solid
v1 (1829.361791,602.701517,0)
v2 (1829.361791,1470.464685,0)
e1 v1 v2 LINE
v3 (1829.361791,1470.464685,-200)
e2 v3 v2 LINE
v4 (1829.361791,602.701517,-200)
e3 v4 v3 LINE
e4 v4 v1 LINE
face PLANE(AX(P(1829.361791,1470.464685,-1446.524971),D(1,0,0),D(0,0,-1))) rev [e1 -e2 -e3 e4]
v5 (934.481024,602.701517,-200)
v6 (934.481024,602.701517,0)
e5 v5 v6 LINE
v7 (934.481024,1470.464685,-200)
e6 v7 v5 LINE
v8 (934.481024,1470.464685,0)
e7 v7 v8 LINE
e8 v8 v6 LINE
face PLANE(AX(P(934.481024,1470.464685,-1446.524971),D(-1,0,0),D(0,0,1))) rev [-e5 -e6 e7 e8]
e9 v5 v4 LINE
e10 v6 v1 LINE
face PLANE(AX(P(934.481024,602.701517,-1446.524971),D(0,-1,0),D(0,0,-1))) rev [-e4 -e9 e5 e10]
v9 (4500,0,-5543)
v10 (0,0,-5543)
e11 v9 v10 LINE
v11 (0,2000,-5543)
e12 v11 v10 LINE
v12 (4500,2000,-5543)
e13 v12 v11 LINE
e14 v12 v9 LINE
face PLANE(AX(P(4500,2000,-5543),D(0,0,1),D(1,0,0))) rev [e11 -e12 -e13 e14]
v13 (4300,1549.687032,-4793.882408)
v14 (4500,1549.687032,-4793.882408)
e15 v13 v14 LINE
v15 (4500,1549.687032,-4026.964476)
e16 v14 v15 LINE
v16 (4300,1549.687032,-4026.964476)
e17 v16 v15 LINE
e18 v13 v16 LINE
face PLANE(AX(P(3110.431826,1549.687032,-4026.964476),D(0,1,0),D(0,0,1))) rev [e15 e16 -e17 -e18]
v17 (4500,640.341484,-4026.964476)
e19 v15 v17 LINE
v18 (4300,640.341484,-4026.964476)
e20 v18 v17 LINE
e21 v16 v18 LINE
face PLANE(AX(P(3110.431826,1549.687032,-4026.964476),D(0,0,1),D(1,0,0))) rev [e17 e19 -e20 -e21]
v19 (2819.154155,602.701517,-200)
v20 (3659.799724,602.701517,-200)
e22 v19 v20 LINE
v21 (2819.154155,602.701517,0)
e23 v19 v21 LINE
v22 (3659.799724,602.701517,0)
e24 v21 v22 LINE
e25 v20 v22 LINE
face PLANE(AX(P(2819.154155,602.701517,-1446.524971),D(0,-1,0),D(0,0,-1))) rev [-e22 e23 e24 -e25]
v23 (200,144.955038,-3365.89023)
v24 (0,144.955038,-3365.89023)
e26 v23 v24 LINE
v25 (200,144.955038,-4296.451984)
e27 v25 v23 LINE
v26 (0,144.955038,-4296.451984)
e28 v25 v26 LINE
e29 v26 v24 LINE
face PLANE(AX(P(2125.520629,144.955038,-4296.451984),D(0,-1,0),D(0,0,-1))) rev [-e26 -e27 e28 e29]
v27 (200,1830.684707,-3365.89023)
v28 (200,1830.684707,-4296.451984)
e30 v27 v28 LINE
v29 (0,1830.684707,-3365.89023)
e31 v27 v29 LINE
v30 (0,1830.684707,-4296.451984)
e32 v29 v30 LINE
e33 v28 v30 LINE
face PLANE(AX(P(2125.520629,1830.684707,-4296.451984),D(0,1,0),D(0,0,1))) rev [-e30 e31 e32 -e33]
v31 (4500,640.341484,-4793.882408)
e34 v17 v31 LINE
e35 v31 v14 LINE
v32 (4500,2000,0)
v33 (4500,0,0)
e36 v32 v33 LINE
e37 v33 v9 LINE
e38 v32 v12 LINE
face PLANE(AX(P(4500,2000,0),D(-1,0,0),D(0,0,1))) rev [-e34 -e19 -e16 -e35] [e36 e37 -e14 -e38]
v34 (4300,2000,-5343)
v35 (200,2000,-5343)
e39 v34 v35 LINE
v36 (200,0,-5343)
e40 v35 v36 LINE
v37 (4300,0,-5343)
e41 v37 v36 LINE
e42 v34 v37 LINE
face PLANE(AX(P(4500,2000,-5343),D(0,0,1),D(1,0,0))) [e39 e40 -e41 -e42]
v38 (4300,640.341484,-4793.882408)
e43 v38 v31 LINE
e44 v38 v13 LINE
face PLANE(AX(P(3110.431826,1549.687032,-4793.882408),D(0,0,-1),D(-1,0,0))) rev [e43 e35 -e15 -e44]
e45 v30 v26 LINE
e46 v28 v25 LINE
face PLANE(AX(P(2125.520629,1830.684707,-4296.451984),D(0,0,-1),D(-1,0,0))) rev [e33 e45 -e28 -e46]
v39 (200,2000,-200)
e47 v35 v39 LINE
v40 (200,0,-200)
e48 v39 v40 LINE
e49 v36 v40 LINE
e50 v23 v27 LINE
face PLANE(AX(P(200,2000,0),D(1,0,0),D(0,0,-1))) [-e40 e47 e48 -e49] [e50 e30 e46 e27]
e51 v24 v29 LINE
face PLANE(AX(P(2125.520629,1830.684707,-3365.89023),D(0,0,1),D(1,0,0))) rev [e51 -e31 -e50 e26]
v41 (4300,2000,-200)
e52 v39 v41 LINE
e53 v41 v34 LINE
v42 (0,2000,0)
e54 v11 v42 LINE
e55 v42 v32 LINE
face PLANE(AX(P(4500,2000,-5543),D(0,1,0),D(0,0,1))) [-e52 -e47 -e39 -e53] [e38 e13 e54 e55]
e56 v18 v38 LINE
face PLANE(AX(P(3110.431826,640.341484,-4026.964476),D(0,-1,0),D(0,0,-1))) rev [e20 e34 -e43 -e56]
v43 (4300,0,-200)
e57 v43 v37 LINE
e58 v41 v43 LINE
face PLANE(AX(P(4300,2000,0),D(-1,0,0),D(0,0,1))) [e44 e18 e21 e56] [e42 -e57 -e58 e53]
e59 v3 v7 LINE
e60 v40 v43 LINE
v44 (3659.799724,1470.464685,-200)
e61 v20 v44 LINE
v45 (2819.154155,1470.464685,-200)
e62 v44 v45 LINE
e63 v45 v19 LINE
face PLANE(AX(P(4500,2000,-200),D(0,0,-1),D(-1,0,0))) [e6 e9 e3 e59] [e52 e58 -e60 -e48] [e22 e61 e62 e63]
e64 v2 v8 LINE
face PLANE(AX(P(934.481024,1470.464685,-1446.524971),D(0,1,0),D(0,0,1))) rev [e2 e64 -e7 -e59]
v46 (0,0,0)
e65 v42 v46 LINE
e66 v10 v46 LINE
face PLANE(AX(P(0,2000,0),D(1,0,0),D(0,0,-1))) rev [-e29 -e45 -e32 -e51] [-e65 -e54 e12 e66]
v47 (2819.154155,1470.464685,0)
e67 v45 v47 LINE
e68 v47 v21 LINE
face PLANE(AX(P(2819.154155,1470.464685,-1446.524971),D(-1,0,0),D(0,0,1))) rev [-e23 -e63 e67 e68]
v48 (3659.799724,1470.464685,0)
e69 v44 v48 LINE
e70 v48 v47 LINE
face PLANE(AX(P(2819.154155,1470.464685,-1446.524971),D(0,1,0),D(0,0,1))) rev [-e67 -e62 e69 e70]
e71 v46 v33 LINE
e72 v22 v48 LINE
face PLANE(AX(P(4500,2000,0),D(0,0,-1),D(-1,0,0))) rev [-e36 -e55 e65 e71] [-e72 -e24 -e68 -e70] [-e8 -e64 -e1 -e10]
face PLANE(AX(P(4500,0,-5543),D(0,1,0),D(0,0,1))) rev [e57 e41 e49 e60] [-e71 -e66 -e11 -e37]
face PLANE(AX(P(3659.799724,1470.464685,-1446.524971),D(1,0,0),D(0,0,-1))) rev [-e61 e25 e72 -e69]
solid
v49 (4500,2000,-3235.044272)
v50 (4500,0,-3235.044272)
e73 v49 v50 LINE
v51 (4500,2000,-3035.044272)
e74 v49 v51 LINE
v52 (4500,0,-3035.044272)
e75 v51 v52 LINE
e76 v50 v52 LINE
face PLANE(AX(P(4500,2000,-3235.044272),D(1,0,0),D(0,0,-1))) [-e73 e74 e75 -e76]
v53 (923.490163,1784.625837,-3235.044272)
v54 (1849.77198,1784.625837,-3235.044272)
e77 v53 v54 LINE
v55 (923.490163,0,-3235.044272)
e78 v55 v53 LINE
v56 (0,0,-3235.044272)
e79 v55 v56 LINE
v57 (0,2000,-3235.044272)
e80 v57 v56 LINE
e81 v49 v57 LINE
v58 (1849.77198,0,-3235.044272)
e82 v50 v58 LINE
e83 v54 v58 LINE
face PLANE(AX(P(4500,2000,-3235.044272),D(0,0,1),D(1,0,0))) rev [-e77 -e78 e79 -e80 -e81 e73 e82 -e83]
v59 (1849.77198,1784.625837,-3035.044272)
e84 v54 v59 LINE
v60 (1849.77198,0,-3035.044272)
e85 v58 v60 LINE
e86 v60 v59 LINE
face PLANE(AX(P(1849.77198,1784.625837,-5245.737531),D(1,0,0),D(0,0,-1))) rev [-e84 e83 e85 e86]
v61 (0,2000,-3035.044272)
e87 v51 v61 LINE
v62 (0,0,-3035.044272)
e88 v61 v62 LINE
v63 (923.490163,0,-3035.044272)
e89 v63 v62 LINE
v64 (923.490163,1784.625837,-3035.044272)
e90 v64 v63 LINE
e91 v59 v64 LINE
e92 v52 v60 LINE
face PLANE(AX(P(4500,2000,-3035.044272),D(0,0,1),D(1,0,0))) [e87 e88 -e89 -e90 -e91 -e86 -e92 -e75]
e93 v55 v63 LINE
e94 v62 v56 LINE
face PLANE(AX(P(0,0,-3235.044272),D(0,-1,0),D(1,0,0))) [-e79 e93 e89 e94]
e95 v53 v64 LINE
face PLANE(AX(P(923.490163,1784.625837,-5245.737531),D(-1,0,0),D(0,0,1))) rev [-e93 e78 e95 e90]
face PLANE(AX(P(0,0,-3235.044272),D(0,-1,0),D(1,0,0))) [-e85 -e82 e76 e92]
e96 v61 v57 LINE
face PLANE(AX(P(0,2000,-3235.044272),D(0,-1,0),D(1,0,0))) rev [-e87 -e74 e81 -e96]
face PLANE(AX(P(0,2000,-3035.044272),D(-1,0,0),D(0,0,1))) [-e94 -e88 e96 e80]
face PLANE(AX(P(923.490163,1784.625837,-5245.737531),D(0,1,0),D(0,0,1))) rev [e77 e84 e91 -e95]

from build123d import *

# Parameters (mm, degrees)
EXTRUDE_1_OUTLINE_W   = 4500
EXTRUDE_1_OUTLINE_H   = 5543
EXTRUDE_1_OUTLINE_W_2 = 4100
EXTRUDE_1_OUTLINE_H_2 = 5143
EXTRUDE_1_DEPTH       = 2000
EXTRUDE_1_2_OUTLINE_W = 4500
EXTRUDE_1_2_OUTLINE_H = 200
EXTRUDE_1_2_DEPTH     = 2000
SKETCH_3_W            = 894.880767268
SKETCH_3_H            = 867.76316826
SKETCH_3_W_2          = 840.645569252
CUT_EXTRUDE_1_DEPTH   = 200
SKETCH_4_W            = 926.281817019
SKETCH_4_H            = 1784.625837091
CUT_EXTRUDE_2_DEPTH   = 200
SKETCH_5_W            = 766.917931954
SKETCH_5_H            = 909.345547887
CUT_EXTRUDE_3_DEPTH   = 200
SKETCH_6_W            = 930.561753535
SKETCH_6_H            = 1685.729668706
CUT_EXTRUDE_4_DEPTH   = 200


# Read off the part's stored shape, not the designer's step: Вытянуть-Тонкостенный1
with BuildPart() as part:
    # Вытянуть-Тонкостенный1 outline → Вытянуть-Тонкостенный1 (new body)
    with BuildSketch(Plane(origin=(0, 0, 0), x_dir=(-1, 0, 0), z_dir=(0, 1, 0))):
        with Locations((-2250, -2771.5)):
            Rectangle(EXTRUDE_1_OUTLINE_W, EXTRUDE_1_OUTLINE_H)
        with Locations((-2250, -2771.5)):
            Rectangle(EXTRUDE_1_OUTLINE_W_2, EXTRUDE_1_OUTLINE_H_2, mode=Mode.SUBTRACT)
    extrude(amount=EXTRUDE_1_DEPTH)

    # Эскиз3 → Вырез-Вытянуть1 (cut)
    with BuildSketch(Plane.XY):
        with Locations((1381.9214075, 1036.583100649)):
            Rectangle(SKETCH_3_W, SKETCH_3_H)
        with Locations((3239.476939556, 1036.583100649)):
            Rectangle(SKETCH_3_W_2, SKETCH_3_H)
    extrude(amount=-CUT_EXTRUDE_1_DEPTH, mode=Mode.SUBTRACT)

    # Эскиз5 → Вырез-Вытянуть3 (cut)
    with BuildSketch(Plane(origin=(4500, 0, 0), x_dir=(0, 0, -1), z_dir=(1, 0, 0))):
        with Locations((4410.423442282, 1095.014257943)):
            Rectangle(SKETCH_5_W, SKETCH_5_H)
    extrude(amount=-CUT_EXTRUDE_3_DEPTH, mode=Mode.SUBTRACT)

    # Эскиз6 → Вырез-Вытянуть4 (cut)
    with BuildSketch(Plane.ZY):
        with Locations((-3831.171106774, 987.819872336)):
            Rectangle(SKETCH_6_W, SKETCH_6_H)
    extrude(amount=-CUT_EXTRUDE_4_DEPTH, mode=Mode.SUBTRACT)


with BuildPart() as body_2:
    # Extrude 1 2 outline → Extrude 1 2 (new body)
    with BuildSketch(Plane(origin=(0, 0, 0), x_dir=(-1, 0, 0), z_dir=(0, 1, 0))):
        with Locations((-2250, -3135.044271929)):
            Rectangle(EXTRUDE_1_2_OUTLINE_W, EXTRUDE_1_2_OUTLINE_H)
    extrude(amount=EXTRUDE_1_2_DEPTH)

    # Эскиз4 → Вырез-Вытянуть2 (cut)
    with BuildSketch(Plane.XY.offset(-3035.044271929)):
        with Locations((1386.631071625, 892.312918546)):
            Rectangle(SKETCH_4_W, SKETCH_4_H)
    extrude(amount=-CUT_EXTRUDE_2_DEPTH, mode=Mode.SUBTRACT)


solid = Compound([part.part, body_2.part])
